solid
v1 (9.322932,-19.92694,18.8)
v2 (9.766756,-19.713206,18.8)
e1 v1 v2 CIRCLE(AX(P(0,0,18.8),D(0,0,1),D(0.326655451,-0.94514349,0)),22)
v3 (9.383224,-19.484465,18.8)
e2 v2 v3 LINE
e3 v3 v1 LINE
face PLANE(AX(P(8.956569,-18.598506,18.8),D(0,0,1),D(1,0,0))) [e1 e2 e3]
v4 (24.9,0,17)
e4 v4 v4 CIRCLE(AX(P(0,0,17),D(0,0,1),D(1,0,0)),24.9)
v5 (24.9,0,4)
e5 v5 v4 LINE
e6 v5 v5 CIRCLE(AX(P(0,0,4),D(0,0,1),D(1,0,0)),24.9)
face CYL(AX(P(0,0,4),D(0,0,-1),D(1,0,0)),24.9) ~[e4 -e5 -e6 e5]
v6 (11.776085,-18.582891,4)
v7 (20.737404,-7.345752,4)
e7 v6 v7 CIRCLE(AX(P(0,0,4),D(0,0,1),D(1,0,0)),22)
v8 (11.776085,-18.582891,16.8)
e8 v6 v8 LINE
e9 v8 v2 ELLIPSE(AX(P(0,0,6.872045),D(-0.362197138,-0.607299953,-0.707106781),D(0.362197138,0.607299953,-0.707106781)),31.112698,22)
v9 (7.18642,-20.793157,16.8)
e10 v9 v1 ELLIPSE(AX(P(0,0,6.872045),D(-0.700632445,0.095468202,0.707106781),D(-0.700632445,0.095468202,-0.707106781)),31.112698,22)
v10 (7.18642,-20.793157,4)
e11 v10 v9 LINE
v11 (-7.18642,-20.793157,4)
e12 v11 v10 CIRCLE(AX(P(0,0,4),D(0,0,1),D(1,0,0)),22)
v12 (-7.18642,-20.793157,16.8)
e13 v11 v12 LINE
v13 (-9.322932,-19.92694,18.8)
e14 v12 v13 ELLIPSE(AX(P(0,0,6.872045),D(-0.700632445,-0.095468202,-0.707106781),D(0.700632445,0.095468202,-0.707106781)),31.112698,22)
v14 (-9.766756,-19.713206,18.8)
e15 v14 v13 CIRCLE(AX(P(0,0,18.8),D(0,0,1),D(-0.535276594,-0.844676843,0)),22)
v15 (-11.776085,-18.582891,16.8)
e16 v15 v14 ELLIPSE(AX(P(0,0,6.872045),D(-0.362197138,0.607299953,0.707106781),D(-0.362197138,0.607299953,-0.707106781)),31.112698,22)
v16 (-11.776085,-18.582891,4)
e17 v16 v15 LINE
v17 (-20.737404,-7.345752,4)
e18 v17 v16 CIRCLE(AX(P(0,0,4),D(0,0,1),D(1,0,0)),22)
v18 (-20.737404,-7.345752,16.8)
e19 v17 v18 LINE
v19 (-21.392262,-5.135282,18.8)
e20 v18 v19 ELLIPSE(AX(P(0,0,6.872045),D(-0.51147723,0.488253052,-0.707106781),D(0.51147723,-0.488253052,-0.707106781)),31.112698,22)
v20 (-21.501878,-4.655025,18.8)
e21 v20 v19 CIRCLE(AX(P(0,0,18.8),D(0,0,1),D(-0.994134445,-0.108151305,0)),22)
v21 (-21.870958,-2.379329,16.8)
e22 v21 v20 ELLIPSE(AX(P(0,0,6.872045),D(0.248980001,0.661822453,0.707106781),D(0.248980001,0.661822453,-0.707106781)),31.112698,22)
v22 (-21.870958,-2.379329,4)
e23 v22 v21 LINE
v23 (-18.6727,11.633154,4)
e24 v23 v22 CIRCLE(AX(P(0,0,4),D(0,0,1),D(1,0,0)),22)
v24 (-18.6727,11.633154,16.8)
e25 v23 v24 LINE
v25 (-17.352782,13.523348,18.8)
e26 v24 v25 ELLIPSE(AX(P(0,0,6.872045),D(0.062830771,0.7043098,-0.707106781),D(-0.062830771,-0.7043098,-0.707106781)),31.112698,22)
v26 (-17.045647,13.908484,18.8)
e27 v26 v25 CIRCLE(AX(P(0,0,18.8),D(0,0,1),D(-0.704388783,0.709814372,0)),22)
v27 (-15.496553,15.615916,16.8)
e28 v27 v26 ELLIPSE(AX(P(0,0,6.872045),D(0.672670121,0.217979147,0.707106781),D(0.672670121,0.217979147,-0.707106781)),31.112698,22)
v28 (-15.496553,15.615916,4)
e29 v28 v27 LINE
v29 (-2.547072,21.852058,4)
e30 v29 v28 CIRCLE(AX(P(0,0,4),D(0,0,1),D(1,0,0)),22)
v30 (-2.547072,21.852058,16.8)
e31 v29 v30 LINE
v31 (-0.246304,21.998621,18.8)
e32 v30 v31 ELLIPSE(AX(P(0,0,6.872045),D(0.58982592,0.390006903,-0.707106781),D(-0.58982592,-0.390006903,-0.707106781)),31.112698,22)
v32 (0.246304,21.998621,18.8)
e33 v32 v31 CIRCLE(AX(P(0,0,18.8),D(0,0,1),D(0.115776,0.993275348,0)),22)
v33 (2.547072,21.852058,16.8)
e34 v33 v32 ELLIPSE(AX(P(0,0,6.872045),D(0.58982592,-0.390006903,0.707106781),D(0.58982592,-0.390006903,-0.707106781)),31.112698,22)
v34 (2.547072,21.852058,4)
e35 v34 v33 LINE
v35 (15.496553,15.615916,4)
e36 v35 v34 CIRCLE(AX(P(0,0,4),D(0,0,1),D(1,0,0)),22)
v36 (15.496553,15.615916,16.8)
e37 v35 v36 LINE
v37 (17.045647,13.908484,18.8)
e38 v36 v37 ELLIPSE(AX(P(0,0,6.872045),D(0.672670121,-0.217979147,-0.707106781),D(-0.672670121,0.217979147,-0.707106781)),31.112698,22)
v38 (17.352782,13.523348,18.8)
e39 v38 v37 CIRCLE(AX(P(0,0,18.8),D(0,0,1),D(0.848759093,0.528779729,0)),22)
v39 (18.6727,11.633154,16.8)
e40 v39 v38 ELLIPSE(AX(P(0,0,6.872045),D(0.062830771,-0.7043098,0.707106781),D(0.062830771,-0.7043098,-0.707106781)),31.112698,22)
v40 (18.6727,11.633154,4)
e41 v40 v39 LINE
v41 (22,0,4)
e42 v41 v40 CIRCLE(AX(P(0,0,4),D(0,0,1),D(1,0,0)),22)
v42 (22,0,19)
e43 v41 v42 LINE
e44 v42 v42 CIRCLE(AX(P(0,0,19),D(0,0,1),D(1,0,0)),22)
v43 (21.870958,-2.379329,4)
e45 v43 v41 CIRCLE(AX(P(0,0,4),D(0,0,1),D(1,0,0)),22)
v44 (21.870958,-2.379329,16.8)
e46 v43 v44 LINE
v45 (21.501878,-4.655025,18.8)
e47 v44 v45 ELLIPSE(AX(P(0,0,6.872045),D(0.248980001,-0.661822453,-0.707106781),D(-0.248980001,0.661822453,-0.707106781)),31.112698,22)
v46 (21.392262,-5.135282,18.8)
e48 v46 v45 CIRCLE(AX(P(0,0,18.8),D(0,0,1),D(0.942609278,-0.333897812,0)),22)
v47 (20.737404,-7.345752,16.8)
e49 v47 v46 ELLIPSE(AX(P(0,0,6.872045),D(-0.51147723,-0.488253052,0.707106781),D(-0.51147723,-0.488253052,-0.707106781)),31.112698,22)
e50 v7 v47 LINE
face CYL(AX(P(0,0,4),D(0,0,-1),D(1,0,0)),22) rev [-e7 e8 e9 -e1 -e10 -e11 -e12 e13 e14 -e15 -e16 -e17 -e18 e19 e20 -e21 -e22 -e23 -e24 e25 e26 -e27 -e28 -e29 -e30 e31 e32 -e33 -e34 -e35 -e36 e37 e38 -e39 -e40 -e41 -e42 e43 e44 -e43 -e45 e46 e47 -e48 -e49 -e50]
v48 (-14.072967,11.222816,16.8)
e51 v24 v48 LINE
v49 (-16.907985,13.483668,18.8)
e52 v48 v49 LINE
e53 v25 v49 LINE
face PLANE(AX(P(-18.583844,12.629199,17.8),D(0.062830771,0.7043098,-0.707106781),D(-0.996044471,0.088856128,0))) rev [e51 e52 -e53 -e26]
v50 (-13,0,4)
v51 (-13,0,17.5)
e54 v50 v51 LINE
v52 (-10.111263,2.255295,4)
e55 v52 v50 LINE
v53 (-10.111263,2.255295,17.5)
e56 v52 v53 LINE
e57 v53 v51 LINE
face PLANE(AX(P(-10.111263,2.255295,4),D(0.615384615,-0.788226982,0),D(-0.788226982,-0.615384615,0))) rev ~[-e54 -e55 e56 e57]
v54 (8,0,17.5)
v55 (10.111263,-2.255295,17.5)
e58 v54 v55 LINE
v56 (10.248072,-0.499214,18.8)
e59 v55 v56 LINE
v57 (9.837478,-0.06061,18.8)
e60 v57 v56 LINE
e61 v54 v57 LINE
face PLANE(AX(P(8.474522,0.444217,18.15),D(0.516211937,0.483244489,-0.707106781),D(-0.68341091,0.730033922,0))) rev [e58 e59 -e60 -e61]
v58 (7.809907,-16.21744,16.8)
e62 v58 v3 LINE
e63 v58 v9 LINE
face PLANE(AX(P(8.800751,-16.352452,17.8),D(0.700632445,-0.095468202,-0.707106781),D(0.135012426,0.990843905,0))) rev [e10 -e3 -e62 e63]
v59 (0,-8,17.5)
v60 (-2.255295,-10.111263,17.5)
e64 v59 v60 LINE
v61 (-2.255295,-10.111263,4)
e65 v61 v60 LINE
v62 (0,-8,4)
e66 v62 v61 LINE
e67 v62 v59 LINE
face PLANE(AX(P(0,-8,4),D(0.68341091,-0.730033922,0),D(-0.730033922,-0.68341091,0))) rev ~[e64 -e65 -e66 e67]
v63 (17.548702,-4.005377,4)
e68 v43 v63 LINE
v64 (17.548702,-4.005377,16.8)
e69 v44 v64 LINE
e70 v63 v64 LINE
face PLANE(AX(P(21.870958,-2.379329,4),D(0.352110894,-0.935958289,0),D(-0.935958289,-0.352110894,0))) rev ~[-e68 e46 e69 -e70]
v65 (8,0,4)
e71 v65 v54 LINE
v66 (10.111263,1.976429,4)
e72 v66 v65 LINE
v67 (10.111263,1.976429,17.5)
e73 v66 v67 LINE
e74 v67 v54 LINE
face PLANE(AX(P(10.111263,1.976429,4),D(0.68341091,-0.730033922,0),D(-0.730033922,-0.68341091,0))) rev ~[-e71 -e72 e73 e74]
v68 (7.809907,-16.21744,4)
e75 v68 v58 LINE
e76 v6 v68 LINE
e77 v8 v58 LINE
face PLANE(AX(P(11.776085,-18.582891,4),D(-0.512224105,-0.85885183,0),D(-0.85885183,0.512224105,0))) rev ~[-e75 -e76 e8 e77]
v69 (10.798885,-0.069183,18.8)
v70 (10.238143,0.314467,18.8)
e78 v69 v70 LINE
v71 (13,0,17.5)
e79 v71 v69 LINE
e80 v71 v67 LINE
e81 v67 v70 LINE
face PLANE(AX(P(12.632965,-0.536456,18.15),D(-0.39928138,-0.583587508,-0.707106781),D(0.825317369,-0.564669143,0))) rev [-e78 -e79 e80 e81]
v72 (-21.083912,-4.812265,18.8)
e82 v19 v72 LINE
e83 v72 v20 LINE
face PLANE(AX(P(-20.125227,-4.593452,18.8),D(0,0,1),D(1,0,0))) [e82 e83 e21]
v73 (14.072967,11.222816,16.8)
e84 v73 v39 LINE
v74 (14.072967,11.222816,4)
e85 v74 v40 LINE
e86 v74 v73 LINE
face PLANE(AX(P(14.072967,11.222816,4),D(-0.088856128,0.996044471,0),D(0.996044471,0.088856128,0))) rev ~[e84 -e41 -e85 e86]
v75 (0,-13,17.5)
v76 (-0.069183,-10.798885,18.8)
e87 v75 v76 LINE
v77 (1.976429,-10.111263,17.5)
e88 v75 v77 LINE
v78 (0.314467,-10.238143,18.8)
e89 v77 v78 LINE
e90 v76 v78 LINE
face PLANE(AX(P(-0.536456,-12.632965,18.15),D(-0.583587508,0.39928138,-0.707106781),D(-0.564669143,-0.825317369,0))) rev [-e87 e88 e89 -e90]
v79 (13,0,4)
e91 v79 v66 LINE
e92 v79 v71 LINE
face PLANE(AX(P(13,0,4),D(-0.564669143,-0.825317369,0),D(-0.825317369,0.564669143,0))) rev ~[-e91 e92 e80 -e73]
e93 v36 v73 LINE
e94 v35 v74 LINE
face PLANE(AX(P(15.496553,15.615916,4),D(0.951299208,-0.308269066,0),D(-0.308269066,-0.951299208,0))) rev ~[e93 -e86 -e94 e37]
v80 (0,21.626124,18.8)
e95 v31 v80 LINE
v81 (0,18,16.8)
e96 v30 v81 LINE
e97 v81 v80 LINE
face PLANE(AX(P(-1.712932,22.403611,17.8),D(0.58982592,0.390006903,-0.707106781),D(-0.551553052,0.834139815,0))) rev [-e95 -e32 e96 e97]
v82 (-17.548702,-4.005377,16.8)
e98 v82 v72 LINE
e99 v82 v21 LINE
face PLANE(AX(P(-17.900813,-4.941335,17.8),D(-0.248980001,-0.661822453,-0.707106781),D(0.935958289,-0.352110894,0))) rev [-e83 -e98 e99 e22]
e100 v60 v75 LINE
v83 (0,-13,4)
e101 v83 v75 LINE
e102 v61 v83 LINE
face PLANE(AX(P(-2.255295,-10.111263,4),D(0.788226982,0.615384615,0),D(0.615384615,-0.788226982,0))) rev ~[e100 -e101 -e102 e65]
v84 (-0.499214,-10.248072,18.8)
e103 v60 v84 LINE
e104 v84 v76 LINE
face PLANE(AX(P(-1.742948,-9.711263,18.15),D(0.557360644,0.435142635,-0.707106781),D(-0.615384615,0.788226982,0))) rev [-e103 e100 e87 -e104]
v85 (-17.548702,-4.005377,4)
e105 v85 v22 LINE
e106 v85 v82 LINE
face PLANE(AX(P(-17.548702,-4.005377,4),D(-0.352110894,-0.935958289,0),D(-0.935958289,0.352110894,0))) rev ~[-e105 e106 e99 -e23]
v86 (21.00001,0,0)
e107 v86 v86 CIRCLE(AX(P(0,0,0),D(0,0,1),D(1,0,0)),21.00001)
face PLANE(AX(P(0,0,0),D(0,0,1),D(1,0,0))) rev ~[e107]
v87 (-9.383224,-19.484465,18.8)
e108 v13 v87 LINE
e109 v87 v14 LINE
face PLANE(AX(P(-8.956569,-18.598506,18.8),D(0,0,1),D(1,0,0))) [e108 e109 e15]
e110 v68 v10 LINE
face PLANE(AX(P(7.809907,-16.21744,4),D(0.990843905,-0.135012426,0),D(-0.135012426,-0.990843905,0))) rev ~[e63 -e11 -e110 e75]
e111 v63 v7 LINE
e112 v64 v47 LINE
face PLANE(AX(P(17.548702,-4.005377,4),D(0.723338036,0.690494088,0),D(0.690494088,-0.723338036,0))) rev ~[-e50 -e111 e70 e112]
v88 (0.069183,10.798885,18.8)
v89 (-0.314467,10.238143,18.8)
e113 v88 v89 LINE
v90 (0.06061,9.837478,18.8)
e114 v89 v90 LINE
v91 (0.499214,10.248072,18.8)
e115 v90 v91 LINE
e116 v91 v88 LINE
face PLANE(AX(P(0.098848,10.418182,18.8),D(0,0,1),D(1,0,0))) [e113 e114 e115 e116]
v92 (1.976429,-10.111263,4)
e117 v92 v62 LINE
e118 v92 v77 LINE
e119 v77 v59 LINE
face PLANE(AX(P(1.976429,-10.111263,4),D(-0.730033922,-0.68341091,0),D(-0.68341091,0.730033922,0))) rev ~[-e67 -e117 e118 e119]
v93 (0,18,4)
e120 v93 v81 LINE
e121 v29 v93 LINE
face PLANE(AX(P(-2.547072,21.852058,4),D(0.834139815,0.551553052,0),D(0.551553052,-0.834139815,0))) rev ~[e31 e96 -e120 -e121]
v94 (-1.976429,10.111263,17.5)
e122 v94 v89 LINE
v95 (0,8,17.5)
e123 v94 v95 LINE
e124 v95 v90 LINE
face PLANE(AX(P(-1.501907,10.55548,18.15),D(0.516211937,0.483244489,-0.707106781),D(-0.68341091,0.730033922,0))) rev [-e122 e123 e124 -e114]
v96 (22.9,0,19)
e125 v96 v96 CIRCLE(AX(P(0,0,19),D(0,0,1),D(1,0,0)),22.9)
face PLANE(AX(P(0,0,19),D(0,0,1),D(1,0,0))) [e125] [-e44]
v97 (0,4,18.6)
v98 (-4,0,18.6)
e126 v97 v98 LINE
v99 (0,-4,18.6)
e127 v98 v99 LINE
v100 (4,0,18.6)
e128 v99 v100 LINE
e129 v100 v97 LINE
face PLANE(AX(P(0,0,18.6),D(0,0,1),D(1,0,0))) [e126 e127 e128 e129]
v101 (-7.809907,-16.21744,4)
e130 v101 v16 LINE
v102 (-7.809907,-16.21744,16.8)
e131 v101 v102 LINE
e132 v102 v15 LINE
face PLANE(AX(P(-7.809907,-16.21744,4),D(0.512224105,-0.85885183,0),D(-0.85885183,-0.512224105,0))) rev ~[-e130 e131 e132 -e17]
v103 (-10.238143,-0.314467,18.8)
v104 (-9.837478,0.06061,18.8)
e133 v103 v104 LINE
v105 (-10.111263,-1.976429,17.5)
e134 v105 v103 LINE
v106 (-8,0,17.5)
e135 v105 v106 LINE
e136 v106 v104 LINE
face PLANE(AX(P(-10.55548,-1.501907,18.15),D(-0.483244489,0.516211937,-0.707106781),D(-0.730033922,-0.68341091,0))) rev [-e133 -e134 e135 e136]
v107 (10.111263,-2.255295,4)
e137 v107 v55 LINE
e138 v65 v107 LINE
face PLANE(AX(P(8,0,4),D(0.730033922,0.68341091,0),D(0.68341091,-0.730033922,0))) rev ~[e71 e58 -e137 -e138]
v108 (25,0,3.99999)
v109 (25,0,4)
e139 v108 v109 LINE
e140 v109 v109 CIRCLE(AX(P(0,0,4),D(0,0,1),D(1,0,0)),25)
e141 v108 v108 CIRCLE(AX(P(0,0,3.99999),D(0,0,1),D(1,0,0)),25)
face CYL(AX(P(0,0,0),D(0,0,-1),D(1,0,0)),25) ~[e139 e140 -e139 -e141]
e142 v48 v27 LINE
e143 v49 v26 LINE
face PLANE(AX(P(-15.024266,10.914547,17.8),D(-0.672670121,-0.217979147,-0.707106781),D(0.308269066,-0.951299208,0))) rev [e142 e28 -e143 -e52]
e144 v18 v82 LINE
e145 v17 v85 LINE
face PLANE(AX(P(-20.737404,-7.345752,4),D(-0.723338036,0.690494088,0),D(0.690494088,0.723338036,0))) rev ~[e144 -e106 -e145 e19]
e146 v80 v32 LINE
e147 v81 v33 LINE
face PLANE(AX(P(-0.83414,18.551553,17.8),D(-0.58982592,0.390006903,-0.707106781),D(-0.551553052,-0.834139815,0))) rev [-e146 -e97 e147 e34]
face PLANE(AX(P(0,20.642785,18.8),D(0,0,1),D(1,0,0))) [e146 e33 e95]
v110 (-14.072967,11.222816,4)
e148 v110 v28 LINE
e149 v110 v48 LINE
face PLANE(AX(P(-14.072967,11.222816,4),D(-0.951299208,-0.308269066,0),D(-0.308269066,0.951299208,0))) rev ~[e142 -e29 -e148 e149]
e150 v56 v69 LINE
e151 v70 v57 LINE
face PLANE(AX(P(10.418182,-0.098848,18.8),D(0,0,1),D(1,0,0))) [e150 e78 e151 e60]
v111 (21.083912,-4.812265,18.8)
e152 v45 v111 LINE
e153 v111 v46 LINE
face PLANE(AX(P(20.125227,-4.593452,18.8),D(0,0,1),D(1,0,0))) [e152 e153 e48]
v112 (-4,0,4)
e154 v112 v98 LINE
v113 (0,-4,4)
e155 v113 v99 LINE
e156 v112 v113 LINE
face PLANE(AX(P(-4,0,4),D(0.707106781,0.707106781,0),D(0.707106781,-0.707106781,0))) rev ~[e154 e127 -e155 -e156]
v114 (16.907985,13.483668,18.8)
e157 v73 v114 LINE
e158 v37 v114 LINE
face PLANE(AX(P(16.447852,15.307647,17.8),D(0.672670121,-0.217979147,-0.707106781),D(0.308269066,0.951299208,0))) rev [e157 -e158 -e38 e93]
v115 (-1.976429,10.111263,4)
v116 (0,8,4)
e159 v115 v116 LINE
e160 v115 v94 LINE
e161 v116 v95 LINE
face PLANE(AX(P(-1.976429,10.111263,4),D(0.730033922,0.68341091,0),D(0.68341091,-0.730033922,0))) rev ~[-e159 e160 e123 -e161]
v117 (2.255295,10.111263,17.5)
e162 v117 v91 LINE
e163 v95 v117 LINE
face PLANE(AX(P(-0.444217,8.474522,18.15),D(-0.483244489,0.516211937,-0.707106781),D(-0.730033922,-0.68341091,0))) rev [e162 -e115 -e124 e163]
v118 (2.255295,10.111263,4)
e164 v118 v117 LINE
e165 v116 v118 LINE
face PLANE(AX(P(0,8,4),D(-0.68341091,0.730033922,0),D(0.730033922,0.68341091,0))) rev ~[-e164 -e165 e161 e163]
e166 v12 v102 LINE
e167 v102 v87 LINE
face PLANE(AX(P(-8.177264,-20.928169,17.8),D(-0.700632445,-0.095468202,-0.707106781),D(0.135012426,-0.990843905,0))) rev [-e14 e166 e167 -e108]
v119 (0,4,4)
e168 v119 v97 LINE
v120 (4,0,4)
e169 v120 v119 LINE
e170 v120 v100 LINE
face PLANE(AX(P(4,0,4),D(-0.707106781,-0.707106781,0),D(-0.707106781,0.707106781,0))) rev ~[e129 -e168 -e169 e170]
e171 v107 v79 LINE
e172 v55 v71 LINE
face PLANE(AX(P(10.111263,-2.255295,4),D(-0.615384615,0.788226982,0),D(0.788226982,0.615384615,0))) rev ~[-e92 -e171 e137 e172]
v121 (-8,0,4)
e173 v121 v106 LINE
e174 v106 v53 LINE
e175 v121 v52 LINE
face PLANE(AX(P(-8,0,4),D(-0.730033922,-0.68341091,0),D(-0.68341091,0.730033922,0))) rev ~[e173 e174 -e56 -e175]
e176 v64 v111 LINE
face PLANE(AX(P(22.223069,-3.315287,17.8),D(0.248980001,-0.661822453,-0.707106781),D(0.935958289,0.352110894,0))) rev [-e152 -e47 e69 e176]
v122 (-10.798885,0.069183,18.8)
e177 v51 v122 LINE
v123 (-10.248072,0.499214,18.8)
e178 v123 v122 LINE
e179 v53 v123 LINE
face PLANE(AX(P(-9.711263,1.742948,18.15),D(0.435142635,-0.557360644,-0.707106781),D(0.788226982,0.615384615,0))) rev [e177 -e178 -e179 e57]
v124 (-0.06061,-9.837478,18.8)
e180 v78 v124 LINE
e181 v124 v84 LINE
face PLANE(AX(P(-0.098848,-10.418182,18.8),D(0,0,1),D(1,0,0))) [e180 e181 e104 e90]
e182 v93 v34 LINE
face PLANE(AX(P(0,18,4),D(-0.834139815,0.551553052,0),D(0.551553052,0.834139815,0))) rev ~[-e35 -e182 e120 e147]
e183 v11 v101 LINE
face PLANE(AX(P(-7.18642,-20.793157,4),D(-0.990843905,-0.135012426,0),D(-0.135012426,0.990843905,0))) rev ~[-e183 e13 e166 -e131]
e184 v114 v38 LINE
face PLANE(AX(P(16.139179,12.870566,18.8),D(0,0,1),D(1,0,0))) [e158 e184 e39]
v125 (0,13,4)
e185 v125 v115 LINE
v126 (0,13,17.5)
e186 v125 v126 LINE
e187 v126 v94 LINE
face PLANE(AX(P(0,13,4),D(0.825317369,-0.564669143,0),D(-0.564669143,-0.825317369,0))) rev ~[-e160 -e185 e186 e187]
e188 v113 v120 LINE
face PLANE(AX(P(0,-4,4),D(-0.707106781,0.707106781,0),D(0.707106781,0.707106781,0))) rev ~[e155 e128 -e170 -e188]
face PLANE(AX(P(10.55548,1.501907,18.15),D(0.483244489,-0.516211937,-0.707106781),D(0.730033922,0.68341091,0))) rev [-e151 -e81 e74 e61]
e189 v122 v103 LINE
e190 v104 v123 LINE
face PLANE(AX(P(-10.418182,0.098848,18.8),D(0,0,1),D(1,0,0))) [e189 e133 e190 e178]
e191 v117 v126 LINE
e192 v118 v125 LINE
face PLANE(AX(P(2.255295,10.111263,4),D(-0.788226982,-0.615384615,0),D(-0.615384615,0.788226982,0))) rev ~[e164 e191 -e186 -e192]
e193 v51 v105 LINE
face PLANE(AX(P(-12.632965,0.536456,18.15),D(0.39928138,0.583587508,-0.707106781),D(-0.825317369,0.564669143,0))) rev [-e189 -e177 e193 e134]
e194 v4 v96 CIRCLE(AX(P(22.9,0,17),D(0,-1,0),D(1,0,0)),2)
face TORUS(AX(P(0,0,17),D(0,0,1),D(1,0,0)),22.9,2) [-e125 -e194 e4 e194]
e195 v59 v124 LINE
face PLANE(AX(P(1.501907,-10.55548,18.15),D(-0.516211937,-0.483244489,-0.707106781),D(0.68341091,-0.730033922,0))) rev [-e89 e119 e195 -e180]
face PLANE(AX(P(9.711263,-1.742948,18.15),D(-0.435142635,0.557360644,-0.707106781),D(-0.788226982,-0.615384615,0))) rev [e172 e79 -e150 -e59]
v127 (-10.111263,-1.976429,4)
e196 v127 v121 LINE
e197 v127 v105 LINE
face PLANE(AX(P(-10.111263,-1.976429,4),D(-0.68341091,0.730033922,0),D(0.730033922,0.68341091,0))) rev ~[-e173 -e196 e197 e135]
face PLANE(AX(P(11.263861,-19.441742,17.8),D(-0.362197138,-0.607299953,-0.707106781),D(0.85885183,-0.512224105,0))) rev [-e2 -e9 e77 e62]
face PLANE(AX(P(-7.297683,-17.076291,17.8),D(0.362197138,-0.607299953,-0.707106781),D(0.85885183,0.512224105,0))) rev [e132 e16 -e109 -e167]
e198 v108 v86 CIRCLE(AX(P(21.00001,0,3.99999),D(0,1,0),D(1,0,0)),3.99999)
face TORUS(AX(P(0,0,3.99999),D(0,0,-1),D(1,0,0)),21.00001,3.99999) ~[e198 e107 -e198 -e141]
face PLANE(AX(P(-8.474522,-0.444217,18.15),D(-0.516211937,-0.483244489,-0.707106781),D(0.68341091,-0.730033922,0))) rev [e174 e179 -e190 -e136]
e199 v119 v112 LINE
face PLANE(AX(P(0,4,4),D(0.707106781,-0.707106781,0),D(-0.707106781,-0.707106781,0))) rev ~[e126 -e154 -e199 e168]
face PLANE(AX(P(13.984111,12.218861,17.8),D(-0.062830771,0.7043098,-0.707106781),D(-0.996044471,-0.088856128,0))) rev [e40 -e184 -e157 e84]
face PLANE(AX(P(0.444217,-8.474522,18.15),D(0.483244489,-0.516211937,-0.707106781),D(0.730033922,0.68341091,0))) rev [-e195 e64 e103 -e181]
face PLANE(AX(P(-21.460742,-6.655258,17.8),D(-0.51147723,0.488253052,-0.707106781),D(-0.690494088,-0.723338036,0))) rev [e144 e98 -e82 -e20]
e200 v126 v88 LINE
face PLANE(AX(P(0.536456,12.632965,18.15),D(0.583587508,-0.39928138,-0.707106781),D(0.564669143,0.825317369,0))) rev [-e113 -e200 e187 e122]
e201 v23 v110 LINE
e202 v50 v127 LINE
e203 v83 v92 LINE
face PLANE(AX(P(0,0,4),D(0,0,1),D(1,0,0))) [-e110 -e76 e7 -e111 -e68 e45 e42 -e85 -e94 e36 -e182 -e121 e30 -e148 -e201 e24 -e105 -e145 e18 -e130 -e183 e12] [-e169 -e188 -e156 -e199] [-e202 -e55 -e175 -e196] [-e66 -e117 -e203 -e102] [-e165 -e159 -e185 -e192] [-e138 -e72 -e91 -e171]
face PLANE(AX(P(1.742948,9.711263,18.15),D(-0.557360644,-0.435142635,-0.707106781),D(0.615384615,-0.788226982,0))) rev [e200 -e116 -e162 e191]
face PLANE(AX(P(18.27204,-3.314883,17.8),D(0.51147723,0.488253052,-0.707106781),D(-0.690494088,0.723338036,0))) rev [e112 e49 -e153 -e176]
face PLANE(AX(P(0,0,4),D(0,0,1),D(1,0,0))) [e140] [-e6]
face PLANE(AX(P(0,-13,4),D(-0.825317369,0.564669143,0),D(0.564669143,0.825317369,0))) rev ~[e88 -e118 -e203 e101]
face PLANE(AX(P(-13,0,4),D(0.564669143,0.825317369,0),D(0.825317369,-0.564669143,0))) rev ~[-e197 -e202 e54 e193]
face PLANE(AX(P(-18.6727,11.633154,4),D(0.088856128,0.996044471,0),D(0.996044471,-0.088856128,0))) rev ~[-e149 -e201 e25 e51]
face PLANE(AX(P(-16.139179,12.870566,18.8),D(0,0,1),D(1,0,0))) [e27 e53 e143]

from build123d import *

# Parameters (mm, degrees)
F0_R      = 25
F1_DEPTH  = 4
F3_DEPTH  = 14.8
F4_R      = 24.9
F4_R_2    = 22
F5_DEPTH  = 15
F6_SIZE   = 1.3
F7_SIZE   = 2
F8_R      = 3.99999
F9_R      = 2
F10_R     = 4.5599564507
F11_DEPTH = 0.2


# Not quite as in the source:
# - a fillet or chamfer is up to 0.001 mm smaller than in the source, because OpenCascade refuses the exact size
# - a feature names something its author has since deleted; it is built from what else it names


with BuildPart() as f1:
    # F0 (on Top) → F1 (new body)
    with BuildSketch(Plane.XY):
        Circle(F0_R)
    extrude(amount=F1_DEPTH)

    # F2 (on face) → F3 (join)
    with BuildSketch(Plane.XY.offset(4)):
        Polygon((1.9764285987, -10.1112626395), (0, -8), (-2.2552952007, -10.1112626395), (0, -13), align=None)
        Polygon((0, -4), (4, 0), (0, 4), (-4, 0), align=None)
        Polygon((-10.1112626395, -1.9764285987), (-8, 0), (-10.1112626395, 2.2552952007), (-13, 0), align=None)
        Polygon((-1.9764285987, 10.1112626395), (0, 8), (2.2552952007, 10.1112626395), (0, 13), align=None)
        Polygon((10.1112626395, 1.9764285987), (8, 0), (10.1112626395, -2.2552952007), (13, 0), align=None)
        with BuildLine():
            Line((14.0729666844, 11.2228164335), (18.6727000521, 11.6331540333))
            ThreePointArc((18.6727000521, 11.6331540333), (17.2002926143, 13.7167756409), (15.4965532289, 15.6159161763))
            Line((15.4965532289, 15.6159161763), (14.0729666844, 11.2228164335))
        make_face()
        with BuildLine():
            ThreePointArc((20.7374041193, -7.3457518602), (21.448414068, -4.895460547), (21.8709577964, -2.3793287015))
            Line((21.8709577964, -2.3793287015), (17.5487024193, -4.0053768112))
            Line((17.5487024193, -4.0053768112), (20.7374041193, -7.3457518602))
        make_face()
        with BuildLine():
            ThreePointArc((7.1864199187, -20.793156777), (9.5454422606, -19.8213150939), (11.776085057, -18.5828905376))
            Line((11.776085057, -18.5828905376), (7.8099073041, -16.2174396222))
            Line((7.8099073041, -16.2174396222), (7.1864199187, -20.793156777))
        make_face()
        with BuildLine():
            Line((-7.1864199187, -20.793156777), (-7.8099073041, -16.2174396222))
            Line((-7.8099073041, -16.2174396222), (-11.776085057, -18.5828905376))
            ThreePointArc((-11.776085057, -18.5828905376), (-9.5454422606, -19.8213150939), (-7.1864199187, -20.793156777))
        make_face()
        with BuildLine():
            Line((-20.7374041193, -7.3457518602), (-17.5487024193, -4.0053768112))
            Line((-17.5487024193, -4.0053768112), (-21.8709577964, -2.3793287015))
            ThreePointArc((-21.8709577964, -2.3793287015), (-21.448414068, -4.895460547), (-20.7374041193, -7.3457518602))
        make_face()
        with BuildLine():
            Line((-18.6727000521, 11.6331540333), (-14.0729666844, 11.2228164335))
            Line((-14.0729666844, 11.2228164335), (-15.4965532289, 15.6159161763))
            ThreePointArc((-15.4965532289, 15.6159161763), (-17.2002926143, 13.7167756409), (-18.6727000521, 11.6331540333))
        make_face()
        with BuildLine():
            Line((0, 18), (2.547071992, 21.8520576667))
            ThreePointArc((2.547071992, 21.8520576667), (0, 22), (-2.547071992, 21.8520576667))
            Line((-2.547071992, 21.8520576667), (0, 18))
        make_face()
    extrude(amount=F3_DEPTH)

    # F4 (on face) → F5 (join)
    with BuildSketch(Plane.XY.offset(4)):
        Circle(F4_R)
        Circle(F4_R_2, mode=Mode.SUBTRACT)
    extrude(amount=F5_DEPTH)

    # F6
    f6_edges = [f1.edges().sort_by_distance(p)[0] for p in [
        (-9.055631, -0.988214, 18.8),
        (-9.055631, 1.127648, 18.8),
        (-11.555631, 1.127648, 18.8),
        (-11.555631, -0.988214, 18.8),
        (0.988214, -9.055631, 18.8),
        (-1.127648, -9.055631, 18.8),
        (-1.127648, -11.555631, 18.8),
        (0.988214, -11.555631, 18.8),
        (9.055631, 0.988214, 18.8),
        (9.055631, -1.127648, 18.8),
        (11.555631, -1.127648, 18.8),
        (11.555631, 0.988214, 18.8),
        (-0.988214, 9.055631, 18.8),
        (1.127648, 9.055631, 18.8),
        (1.127648, 11.555631, 18.8),
        (-0.988214, 11.555631, 18.8),
    ]]
    chamfer(f6_edges, length=F6_SIZE)

    # F7
    f7_edges = [f1.edges().sort_by_distance(p)[0] for p in [
        (14.78476, 13.419366, 18.8),
        (16.372833, 11.427985, 18.8),
        (19.70983, -3.192353, 18.8),
        (19.143053, -5.675564, 18.8),
        (9.792996, -17.400165, 18.8),
        (7.498164, -18.505298, 18.8),
        (-9.792996, -17.400165, 18.8),
        (-7.498164, -18.505298, 18.8),
        (-19.143053, -5.675564, 18.8),
        (-19.70983, -3.192353, 18.8),
        (-16.372833, 11.427985, 18.8),
        (-1.273536, 19.926029, 18.8),
        (1.273536, 19.926029, 18.8),
        (-14.78476, 13.419366, 18.8),
    ]]
    chamfer(f7_edges, length=F7_SIZE)

    # F8 (radius 4 in the source; OpenCascade refuses exactly that, so slightly less here)
    f8_edges = [f1.edges().sort_by_distance(p)[0] for p in [
        (-25, 0, 0),
    ]]
    fillet(f8_edges, radius=F8_R)

    # F9
    f9_edges = [f1.edges().sort_by_distance(p)[0] for p in [
        (-24.9, 0, 19),
    ]]
    fillet(f9_edges, radius=F9_R)

    # F10 (on face) → F11 (cut)
    with BuildSketch(Plane.XY.offset(18.8)):
        Circle(F10_R)
    extrude(amount=-F11_DEPTH, mode=Mode.SUBTRACT)


solid = f1.part
